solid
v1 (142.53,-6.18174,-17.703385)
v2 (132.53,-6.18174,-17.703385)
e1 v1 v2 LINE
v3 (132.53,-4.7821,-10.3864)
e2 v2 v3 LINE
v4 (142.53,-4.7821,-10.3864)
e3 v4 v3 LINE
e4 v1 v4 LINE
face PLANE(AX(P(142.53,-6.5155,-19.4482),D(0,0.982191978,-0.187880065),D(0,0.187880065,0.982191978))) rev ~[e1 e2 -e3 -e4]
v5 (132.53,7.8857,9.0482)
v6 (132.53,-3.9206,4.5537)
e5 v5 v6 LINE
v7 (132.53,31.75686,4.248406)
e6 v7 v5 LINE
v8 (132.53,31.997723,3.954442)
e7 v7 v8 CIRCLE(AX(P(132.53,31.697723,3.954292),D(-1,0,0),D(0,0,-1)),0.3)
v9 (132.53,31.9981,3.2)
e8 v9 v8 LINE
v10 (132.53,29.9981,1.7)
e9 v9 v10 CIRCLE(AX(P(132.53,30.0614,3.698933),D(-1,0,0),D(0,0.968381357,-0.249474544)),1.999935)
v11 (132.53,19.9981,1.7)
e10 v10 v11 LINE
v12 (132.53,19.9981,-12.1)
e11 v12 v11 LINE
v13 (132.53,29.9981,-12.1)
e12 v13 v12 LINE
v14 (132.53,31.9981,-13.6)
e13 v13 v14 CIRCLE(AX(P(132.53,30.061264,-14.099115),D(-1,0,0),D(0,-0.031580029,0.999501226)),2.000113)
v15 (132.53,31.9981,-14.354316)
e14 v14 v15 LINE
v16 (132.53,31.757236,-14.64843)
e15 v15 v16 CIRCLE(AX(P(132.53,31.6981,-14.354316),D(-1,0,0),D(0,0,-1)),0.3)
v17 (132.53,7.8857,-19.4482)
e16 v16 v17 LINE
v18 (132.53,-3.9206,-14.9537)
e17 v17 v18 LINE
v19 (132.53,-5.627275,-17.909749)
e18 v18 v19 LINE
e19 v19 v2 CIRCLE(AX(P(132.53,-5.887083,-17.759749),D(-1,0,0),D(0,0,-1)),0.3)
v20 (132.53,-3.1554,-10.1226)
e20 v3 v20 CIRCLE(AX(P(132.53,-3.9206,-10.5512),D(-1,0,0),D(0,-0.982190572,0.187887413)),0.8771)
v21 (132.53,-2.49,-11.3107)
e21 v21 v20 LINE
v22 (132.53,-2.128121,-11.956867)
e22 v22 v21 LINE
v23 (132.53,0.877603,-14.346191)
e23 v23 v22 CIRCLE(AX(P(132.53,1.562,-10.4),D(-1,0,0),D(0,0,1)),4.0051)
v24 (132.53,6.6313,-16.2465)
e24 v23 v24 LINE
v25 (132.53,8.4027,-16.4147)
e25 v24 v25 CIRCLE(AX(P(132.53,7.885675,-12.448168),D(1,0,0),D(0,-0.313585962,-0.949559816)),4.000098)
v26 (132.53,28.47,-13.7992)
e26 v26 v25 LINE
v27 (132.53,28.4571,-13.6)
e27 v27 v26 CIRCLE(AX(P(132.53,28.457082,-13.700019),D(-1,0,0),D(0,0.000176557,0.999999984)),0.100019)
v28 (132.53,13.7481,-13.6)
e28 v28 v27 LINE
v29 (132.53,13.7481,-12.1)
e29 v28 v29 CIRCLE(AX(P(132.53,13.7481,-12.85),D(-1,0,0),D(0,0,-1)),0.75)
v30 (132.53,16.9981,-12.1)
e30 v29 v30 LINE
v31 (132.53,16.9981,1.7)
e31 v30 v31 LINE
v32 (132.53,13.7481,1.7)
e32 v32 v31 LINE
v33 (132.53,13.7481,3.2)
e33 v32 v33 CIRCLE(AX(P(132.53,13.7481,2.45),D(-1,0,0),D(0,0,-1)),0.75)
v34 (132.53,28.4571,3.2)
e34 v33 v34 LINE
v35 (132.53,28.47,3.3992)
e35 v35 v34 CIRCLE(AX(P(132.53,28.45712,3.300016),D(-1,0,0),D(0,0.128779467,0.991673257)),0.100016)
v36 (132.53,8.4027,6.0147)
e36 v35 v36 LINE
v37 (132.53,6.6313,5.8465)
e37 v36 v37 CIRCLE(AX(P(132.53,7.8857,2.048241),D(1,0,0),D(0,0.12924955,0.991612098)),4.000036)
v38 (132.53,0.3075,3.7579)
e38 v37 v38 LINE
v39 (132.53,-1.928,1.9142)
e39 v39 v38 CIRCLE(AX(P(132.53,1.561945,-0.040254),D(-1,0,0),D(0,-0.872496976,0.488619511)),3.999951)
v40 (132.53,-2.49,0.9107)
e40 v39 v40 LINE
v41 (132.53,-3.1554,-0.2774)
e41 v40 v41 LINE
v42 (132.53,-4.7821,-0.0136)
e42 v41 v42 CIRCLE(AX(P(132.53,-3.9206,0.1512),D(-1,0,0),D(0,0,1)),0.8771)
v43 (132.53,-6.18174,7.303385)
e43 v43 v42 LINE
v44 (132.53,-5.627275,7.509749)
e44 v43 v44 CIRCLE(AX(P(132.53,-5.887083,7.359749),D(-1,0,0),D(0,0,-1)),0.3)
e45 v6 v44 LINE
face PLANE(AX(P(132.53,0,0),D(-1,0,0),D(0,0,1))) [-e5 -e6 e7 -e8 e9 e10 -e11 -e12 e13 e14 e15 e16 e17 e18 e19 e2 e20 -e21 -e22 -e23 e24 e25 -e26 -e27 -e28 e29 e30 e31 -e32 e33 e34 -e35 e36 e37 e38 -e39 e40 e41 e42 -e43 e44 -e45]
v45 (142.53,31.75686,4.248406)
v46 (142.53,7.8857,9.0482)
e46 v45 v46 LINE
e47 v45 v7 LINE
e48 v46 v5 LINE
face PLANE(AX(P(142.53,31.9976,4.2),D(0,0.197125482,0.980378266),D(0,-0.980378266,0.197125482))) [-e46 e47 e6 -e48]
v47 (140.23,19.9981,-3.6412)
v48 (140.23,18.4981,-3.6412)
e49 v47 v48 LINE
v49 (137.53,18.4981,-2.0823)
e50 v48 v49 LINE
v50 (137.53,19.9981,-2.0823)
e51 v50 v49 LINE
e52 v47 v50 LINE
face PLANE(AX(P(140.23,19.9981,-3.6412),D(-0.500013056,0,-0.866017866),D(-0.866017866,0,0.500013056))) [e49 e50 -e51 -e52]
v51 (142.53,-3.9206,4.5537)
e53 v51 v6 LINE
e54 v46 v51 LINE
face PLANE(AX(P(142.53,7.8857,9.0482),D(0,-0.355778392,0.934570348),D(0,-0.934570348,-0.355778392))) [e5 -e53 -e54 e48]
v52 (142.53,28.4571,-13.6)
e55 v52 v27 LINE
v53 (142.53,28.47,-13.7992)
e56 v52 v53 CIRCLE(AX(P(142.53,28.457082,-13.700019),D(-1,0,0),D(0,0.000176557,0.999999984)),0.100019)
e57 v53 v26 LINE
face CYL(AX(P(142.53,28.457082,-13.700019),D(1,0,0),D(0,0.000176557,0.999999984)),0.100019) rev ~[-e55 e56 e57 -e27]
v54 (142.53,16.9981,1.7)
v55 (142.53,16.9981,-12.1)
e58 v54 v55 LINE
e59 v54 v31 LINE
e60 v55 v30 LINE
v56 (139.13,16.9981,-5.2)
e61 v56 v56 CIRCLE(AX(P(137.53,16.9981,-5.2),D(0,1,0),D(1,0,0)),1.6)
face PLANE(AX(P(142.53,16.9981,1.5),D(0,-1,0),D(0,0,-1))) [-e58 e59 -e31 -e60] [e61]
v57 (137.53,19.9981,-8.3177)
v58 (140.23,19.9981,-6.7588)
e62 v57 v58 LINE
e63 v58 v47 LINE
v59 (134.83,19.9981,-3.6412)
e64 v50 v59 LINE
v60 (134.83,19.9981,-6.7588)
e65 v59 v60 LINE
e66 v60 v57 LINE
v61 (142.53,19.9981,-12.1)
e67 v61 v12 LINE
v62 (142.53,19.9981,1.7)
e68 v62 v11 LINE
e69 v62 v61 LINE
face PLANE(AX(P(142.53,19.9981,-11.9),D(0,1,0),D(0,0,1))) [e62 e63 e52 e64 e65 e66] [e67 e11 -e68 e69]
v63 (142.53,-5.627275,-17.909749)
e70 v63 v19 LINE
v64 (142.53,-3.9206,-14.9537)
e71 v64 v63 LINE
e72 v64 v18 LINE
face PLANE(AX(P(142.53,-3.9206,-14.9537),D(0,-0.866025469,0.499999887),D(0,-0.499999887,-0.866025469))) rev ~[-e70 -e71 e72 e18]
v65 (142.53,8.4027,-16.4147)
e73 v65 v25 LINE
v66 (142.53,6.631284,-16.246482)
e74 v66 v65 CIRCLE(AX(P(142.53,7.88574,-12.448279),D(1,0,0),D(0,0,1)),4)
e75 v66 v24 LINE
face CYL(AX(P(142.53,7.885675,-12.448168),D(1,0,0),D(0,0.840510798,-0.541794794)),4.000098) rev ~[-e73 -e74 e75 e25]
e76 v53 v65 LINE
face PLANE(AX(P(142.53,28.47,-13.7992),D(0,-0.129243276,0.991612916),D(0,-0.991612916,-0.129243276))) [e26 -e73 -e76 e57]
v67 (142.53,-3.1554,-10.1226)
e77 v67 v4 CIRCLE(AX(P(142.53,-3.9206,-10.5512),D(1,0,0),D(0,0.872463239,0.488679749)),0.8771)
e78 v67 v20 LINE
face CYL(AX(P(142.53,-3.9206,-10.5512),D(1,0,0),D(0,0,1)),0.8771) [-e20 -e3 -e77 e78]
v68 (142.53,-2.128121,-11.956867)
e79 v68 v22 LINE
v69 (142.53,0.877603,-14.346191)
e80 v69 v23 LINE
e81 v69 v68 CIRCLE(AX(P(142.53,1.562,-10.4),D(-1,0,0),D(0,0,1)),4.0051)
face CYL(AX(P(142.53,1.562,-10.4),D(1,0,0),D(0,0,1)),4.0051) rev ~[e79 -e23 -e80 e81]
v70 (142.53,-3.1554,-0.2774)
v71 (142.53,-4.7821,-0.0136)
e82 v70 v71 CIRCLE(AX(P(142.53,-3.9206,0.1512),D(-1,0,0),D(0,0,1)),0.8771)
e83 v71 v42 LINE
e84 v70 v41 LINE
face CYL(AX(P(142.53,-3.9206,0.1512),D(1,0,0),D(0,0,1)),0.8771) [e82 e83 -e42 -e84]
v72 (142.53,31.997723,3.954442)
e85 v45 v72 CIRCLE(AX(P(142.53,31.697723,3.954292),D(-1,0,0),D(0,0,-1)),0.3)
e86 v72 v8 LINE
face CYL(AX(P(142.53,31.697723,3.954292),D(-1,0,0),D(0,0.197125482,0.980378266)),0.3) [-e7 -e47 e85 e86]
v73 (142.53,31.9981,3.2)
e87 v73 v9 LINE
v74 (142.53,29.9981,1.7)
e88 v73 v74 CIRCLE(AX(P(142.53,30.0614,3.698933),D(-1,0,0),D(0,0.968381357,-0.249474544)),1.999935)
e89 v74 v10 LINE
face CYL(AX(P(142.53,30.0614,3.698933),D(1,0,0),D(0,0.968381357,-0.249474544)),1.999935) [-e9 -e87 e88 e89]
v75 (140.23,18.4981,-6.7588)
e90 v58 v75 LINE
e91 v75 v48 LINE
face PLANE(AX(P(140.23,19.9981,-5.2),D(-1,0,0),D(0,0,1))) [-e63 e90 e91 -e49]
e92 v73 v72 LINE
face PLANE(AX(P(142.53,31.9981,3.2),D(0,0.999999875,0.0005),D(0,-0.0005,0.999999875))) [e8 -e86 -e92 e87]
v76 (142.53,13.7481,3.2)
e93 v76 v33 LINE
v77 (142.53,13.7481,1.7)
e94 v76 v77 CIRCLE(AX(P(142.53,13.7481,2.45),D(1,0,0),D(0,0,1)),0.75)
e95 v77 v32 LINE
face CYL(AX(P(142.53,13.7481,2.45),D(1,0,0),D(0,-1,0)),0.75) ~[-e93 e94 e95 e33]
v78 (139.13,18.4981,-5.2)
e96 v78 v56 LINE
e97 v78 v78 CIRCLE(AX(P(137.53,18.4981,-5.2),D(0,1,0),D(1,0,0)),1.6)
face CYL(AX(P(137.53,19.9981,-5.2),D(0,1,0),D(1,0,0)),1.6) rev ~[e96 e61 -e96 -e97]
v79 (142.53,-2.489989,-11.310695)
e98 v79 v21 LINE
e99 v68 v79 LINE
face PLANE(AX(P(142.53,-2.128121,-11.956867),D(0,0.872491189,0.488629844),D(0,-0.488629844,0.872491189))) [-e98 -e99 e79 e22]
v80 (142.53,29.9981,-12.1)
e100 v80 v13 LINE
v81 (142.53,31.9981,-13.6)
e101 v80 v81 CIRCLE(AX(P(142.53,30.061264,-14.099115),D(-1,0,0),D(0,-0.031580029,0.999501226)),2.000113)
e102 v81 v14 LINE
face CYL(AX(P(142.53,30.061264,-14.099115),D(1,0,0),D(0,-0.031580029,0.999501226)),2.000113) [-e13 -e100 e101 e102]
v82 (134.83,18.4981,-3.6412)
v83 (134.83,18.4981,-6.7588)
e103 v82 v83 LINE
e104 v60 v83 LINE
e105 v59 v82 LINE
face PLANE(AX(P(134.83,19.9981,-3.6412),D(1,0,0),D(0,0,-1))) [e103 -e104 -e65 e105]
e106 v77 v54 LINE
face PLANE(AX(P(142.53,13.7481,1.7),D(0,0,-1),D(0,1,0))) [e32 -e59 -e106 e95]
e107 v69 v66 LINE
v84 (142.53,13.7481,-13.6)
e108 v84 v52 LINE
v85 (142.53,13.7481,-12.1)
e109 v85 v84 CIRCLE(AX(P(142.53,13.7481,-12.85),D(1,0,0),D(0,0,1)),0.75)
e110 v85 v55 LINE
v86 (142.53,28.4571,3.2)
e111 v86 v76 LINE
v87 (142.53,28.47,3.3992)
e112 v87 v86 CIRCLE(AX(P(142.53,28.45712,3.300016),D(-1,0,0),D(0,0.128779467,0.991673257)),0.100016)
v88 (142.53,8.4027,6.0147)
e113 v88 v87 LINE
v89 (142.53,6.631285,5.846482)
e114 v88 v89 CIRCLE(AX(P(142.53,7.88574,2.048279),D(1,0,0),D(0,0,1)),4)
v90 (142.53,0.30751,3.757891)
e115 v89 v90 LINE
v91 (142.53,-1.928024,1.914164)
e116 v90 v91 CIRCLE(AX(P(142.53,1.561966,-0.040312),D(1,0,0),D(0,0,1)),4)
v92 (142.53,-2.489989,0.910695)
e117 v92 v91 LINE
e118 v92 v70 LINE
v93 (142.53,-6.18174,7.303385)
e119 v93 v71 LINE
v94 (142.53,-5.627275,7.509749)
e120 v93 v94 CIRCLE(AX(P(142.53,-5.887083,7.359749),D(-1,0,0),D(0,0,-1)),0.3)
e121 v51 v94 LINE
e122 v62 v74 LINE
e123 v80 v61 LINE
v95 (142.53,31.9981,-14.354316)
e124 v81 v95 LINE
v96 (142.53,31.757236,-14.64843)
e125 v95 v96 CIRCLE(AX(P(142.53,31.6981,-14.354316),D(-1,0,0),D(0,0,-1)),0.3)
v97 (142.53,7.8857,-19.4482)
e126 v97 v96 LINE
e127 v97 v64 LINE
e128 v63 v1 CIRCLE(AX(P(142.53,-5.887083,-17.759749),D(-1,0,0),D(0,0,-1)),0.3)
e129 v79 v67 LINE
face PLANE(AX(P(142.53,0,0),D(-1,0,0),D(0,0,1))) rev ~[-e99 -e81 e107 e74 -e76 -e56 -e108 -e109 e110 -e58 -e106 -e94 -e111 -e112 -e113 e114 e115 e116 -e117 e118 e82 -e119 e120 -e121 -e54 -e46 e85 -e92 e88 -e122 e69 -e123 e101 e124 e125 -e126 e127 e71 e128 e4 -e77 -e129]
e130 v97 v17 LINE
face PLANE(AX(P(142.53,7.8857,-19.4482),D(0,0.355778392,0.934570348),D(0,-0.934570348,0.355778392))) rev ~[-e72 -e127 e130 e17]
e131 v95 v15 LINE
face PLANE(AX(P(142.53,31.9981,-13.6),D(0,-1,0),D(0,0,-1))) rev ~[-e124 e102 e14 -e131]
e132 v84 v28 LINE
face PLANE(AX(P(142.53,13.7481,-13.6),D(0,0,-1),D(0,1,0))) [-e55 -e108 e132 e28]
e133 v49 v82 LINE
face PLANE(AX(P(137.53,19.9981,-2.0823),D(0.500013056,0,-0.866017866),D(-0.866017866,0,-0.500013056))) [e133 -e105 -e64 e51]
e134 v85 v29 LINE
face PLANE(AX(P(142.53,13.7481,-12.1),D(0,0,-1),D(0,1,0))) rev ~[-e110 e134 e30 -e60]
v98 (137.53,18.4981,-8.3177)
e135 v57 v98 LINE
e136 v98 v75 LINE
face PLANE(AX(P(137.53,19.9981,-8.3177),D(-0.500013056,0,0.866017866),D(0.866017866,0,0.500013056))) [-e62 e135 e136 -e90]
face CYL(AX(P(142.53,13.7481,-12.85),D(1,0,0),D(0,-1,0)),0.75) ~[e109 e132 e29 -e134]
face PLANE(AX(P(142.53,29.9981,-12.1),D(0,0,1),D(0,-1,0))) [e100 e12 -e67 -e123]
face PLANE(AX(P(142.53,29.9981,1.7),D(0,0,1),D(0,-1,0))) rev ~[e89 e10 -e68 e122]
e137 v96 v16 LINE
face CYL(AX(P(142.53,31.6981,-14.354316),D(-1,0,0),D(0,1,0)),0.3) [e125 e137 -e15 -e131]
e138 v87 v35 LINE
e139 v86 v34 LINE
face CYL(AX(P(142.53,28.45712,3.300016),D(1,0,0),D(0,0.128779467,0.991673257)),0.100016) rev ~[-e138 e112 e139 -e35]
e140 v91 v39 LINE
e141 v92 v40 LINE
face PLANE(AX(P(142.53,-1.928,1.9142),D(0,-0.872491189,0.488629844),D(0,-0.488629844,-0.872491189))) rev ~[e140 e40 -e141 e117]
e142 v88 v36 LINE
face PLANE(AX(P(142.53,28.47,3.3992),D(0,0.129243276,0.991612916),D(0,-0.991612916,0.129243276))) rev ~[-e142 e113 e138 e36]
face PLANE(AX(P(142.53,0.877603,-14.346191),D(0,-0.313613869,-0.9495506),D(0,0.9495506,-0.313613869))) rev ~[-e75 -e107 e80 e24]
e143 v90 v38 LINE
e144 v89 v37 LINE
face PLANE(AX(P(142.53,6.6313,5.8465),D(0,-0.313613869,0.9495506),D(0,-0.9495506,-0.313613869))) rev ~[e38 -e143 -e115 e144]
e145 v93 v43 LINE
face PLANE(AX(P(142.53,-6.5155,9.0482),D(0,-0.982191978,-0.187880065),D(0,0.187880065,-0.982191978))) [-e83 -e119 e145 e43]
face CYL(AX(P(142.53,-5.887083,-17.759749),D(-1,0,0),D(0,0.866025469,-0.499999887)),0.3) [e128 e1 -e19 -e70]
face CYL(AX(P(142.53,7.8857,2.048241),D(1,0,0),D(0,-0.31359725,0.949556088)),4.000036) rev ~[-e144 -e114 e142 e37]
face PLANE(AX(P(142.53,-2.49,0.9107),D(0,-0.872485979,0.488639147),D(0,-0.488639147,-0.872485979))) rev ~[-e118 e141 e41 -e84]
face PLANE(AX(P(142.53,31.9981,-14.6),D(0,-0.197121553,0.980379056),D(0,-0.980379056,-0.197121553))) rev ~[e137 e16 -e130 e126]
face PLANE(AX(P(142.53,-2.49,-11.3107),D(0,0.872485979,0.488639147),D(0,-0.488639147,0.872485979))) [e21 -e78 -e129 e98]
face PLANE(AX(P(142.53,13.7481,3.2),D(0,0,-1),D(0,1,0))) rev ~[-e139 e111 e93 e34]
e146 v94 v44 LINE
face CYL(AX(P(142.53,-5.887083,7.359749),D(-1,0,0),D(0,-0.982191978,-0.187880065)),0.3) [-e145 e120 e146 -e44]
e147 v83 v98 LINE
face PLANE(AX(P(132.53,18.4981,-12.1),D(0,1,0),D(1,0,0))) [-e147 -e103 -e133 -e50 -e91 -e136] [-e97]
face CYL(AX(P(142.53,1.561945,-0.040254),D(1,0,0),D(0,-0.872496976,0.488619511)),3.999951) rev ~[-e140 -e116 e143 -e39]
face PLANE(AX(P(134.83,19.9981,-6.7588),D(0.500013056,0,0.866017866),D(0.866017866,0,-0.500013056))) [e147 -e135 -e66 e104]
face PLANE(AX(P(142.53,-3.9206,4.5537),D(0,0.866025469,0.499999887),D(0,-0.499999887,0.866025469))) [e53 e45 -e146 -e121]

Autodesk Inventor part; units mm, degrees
ref_plane "YZ Plane" through (0, 0, 0) normal (1, 0, 0) x (0, 1, 0)
ref_plane "XZ Plane" through (0, 0, 0) normal (0, 1, 0) x (-1, 0, 0)
ref_plane "XY Plane" through (0, 0, 0) normal (0, 0, 1) x (1, 0, 0)
sketch "Эскиз8" plane through (0, 0, 0) normal (1, 0, 0) x (0, 1, 0)
  line L0 (0, 0) -> (10.4, 0)
  line L1 (10.4, 0) -> (10.4, -10.4)
  line L2 (10.4, -10.4) -> (0, -10.4)
  line L3 (0, -10.4) -> (0, 0)
  line L4 (5.2, 0) -> (5.2, 4)
  line L5 (5.2, -10.4) -> (5.2, -14.4)
  circle A0 centre (5.2, 4) radius 1.6
  circle A1 centre (5.2, -14.4) radius 1.6
  line L6 (5.2, 4) -> (7.9, 4)
  line L7 (7.9, 2.4412) -> (5.2, 0.8823)
  line L8 (5.2, 0.8823) -> (2.5, 2.4412)
  line L9 (2.5, 2.4412) -> (2.5, 5.5588)
  line L10 (2.5, 5.5588) -> (5.2, 7.1177)
  line L11 (5.2, 7.1177) -> (7.9, 5.5588)
  line L12 (7.9, 5.5588) -> (7.9, 2.4412)
  line L13 (7.9, -15.9588) -> (5.2, -17.5177)
  line L14 (5.2, -17.5177) -> (2.5, -15.9588)
  line L15 (2.5, -15.9588) -> (2.5, -12.8412)
  line L16 (2.5, -12.8412) -> (5.2, -11.2823)
  line L17 (5.2, -11.2823) -> (7.9, -12.8412)
  line L18 (7.9, -12.8412) -> (7.9, -15.9588)
  circle A2 centre (5.2, 4) radius 5.2
  circle A3 centre (5.2, -14.4) radius 5.2
  line L19 (10.4, 4) -> (10.4, 0)
  line L20 (10.4, -10.4) -> (10.4, -14.4)
  line L21 (0, -14.4) -> (0, -10.4)
  line L22 (0, 4) -> (0, 0)
  line L23 (7.9, 5.5588) -> (7.9, 8.4441)
  line L24 (2.5, 5.5588) -> (2.5, 8.4441)
  line L25 (2.5, -15.9588) -> (2.5, -18.8441)
  line L26 (7.9, -15.9588) -> (7.9, -18.8441)
  line L27 (0, 0) -> (-3, 0)
  line L28 (-3, 0) -> (-3, -10.4)
  line L29 (-3, -10.4) -> (0, -10.4)
  line L30 (0, -10.4) -> (0, 0)
  line L31 (10.4, 0) -> (8.9, 2.5981)
  line L32 (10.4, -10.4) -> (8.9, -12.9981)
  line L33 (10.4, -10.4) -> (13.4, -10.4) construction
  line L34 (8.9, -12.9981) -> (4.4, -10.4)
  line L35 (8.9, 2.5981) -> (4.4, 0)
  line L36 (-3, 0) -> (0.663, 6.5408)
  line L37 (-3, -10.4) -> (0.663, -16.9408)
  line L38 (10.4, 0) -> (12.9981, 1.5)
  line L39 (12.9981, 1.5) -> (9.5707, 6.8173)
  line L40 (10.4, -10.4) -> (12.9981, -11.9)
  line L41 (12.9981, -11.9) -> (9.5707, -17.2173)
  point P0 (7.9, -14.4)
  dimension "d51" = 10.4
  dimension "d52" = 10.4
  dimension "d53" = 4
  dimension "d54" = 4
  dimension "d55" = 3.2
  dimension "d56" = 3.2
  dimension "d57" = 2.7
  dimension "d58" = 3
  dimension "d59" = 3
  dimension "d60" = 3
  dimension "d61" = 120
  dimension "d62" = 3
  dimension "d63" = 3
extrude "Выдавливание6" add sketch "Эскиз8" along normal blind 5 contours L0 A2 L24 L9 L8 L4 L35 | L0 L22 A2 | L4 L7 L12 L23 A2 L31 L35 | L27 L36 A2 L22 | L3 L29 L28 L27 | L31 A2 L19 | L19 A2 L39 L38 | L2 A3 L21 | L21 A3 L37 L29 | L40 L41 A3 L20 | L20 A3 L32 | L2 L34 L5 L16 L15 L25 A3 | A3 L26 L18 L17 L5 L34 L32
sketch "Эскиз9" plane through (0, 0, 0) normal (-1, 0, 0) x (0, 0, 1)
  arc A0 (-18.8441, 2.5) -> (-16.9408, 0.663) centre (-14.4, 5.2) ccw projected
  circle A1 centre (-14.4, 5.2) radius 5.2
  circle A2 centre (-14.4, 5.2) radius 1.6
  arc A3 (6.5408, 0.663) -> (8.4441, 2.5) centre (4, 5.2) ccw projected
  circle A4 centre (4, 5.2) radius 5.2
  circle A5 centre (4, 5.2) radius 1.6
  line L0 (2.5981, 8.9) -> (0, 10.4) projected
  line L1 (0, 10.4) -> (2.5981, 8.9)
  line L2 (0, 4.4) -> (2.5981, 8.9) projected
  line L3 (2.5981, 8.9) -> (0, 4.4)
  line L4 (0, 0) -> (0, 4.4) projected
  line L5 (0, 4.4) -> (0, 0)
  line L6 (-10.4, 4.4) -> (-10.4, 0) projected
  line L7 (0, 0) -> (-10.4, 0)
  line L8 (-10.4, 0) -> (-10.4, 1.8774)
  line L9 (-10.4, 10.4) -> (-12.9981, 8.9) projected
  line L10 (-11.699, 9.65) -> (-10.4, 10.4)
  line L11 (-11.9, 12.9981) -> (-10.4, 10.4) projected
  line L12 (-10.4, 10.4) -> (-11.9, 12.9981)
  line L13 (-17.2173, 9.5707) -> (-11.9, 12.9981) projected
  line L14 (-11.9, 12.9981) -> (-17.2173, 9.5707)
  line L15 (0, 10.4) -> (1.5, 12.9981) projected
  line L16 (0, 10.4) -> (1.5, 12.9981)
  line L17 (1.5, 12.9981) -> (6.8173, 9.5707) projected
  line L18 (1.5, 12.9981) -> (6.8173, 9.5707)
  line L19 (0, -3) -> (-10.4, -3) projected
  line L20 (0, -3) -> (6.5408, 0.663)
  line L21 (6.5408, 0.663) -> (0, -3) projected
  line L22 (-10.4, -3) -> (-16.9408, 0.663)
  line L23 (-10.4, -3) -> (-16.9408, 0.663) projected
  line L24 (-10.4, -3) -> (0, -3)
  line L25 (-10.4, 0) -> (0, 0) projected
  line L26 (0, 0) -> (-10.4, 0)
  line L27 (-10.4, 0) -> (-10.4, 1.8774)
  line L28 (0, 1.8774) -> (0, 0)
  line L29 (-11.699, 9.65) -> (-12.9981, 8.9)
  line L30 (-12.9981, 8.9) -> (-10.4, 4.4) projected
  line L31 (-10.4, 4.4) -> (-12.9981, 8.9)
  line L32 (-12.9981, 8.9) -> (-10.4, 4.4)
  line L33 (-10.4, 4.4) -> (-10.4, 1.8774)
  line L34 (0, 1.8774) -> (0, 4.4)
  line L35 (2.5981, 8.9) -> (0, 4.4)
  line L36 (1.299, 9.65) -> (2.5981, 8.9)
  point P0 (-18.8441, 2.5)
  point P1 (-16.9408, 0.663)
  point P2 (6.5408, 0.663)
  point P3 (8.4441, 2.5)
  dimension "d66" = 3.2
  dimension "d67" = 3.2
extrude "Выдавливание7" add sketch "Эскиз9" along normal blind 5 contours A1 L9 L30 L6 A0 | A1 L6 L7 L4 A4 L20 L19 L22 | L13 L11 L9 A1 | A4 L4 L2 L0 A3 | L0 L15 L17 A4
sketch "Эскиз10" plane through (5, 0, 0) normal (1, 0, 0) x (0, 0, -1)
  line L0 (-1.5, 12.9981) -> (-6.8173, 9.5707) projected
  line L1 (0, 10.4) -> (-1.5, 12.9981) projected
  line L2 (-1.5, 12.9981) -> (0, 10.4)
  line L3 (-2.5981, 8.9) -> (0, 10.4) projected
  line L4 (0, 10.4) -> (-2.5981, 8.9)
  line L5 (0, 4.4) -> (-2.5981, 8.9) projected
  line L6 (-2.5981, 8.9) -> (0, 4.4)
  line L7 (0, 0) -> (0, 4.4) projected
  line L8 (0, 4.4) -> (0, 0)
  line L9 (10.4, 0) -> (0, 0) projected
  line L10 (0, 0) -> (10.4, 0)
  line L11 (10.4, 4.4) -> (10.4, 0) projected
  line L12 (10.4, 0) -> (10.4, 4.4)
  line L13 (10.4, 10.4) -> (12.9981, 8.9) projected
  line L14 (10.4, 4.4) -> (12.9981, 8.9)
  line L15 (12.9981, 8.9) -> (10.4, 10.4)
  line L16 (11.9, 12.9981) -> (10.4, 10.4) projected
  line L17 (10.4, 10.4) -> (11.9, 12.9981)
  line L18 (17.2173, 9.5707) -> (11.9, 12.9981) projected
  line L19 (11.9, 12.9981) -> (17.2173, 9.5707)
  line L20 (17.2173, 9.5707) -> (13.6704, -1.1685)
  line L21 (10.4, -3) -> (16.9408, 0.663) projected
  line L22 (10.4, -3) -> (13.6704, -1.1685)
  line L23 (0, -3) -> (10.4, -3) projected
  line L24 (-6.5408, 0.663) -> (0, -3) projected
  line L25 (10.4, -3) -> (0, -3)
  arc A0 (-8.4441, 2.5) -> (-6.5408, 0.663) centre (-4, 5.2) ccw projected
  line L26 (0, -3) -> (-6.5408, 0.663)
  line L27 (-3.2704, -1.1685) -> (-6.8173, 9.5707)
  line L28 (-6.8173, 9.5707) -> (-1.5, 12.9981)
extrude "Выдавливание8" add sketch "Эскиз10" along normal blind 157.53
sketch "Эскиз17" plane through (-5, 0, 0) normal (-1, 0, 0) x (0, 0, 1)
  line L0 (-37.7292, 41.1824) -> (41.3103, 41.1824)
  line L1 (41.3103, 41.1824) -> (41.3103, -34.7876)
  line L2 (41.3103, -34.7876) -> (-37.7292, -34.7876)
  line L3 (-37.7292, -34.7876) -> (-37.7292, 41.1824)
  point P0 (0, 0)
extrude "Выдавливание13" cut sketch "Эскиз17" against normal blind 147.53
sketch "Эскиз23" plane through (162.53, 0, 0) normal (1, 0, 0) x (0, 0, -1)
  point P0 (0, 0)
fillet "Сопряжение12" radius 4 6 edges at (152.53, -3, -10.4) (152.53, -1.1685, -13.6704) (152.53, -3, 0) (152.53, -1.1685, 3.2704) (152.53, 9.5707, -17.2173) (152.53, 9.5707, 6.8173)
sketch "Эскиз24" plane through (142.53, 0, 0) normal (-1, 0, 0) x (0, 0, 1)
  line L0 (-11.9, 12.9981) -> (-10.4, 10.4) projected
  line L1 (-11.9, 12.9981) -> (1.5, 12.9981)
  line L2 (1.5, 12.9981) -> (1.5, 16.9981)
  line L3 (1.5, 16.9981) -> (-11.9, 16.9981)
  line L4 (-11.9, 16.9981) -> (-11.9, 12.9981)
  line L5 (1.5, 16.9981) -> (-11.9, 16.9981)
  line L6 (-11.9, 16.9981) -> (-11.9, 19.9981)
  line L7 (-11.9, 19.9981) -> (1.5, 19.9981)
  line L8 (1.5, 19.9981) -> (1.5, 16.9981)
  line L9 (-11.9, 16.9981) -> (-11.7, 16.9981) construction
  line L10 (-14.6154, 11.2478) -> (-11.9, 12.9981) projected
  line L11 (-12.1, 12.9981) -> (-11.9, 12.9981)
  line L12 (1.5, 12.9981) -> (1.7, 12.9981)
  line L13 (1.7, 13.7481) -> (1.7, 19.9981)
  line L14 (1.7, 19.9981) -> (1.5, 19.9981)
  line L15 (-12.1, 13.7481) -> (-12.1, 19.9981)
  line L16 (-12.1, 19.9981) -> (-11.9, 19.9981)
  line L17 (-12.1, 16.9981) -> (-11.9, 16.9981)
  line L18 (1.5, 16.9981) -> (1.7, 16.9981)
  line L19 (-12.85, 12.9981) -> (-12.85, 12.9981)
  line L20 (-13.6, 13.7481) -> (-13.6, 28.4571)
  line L21 (-13.6, 29.9981) -> (-12.1, 29.9981)
  line L22 (-12.1, 29.9981) -> (-12.1, 12.9981)
  line L23 (2.45, 12.9981) -> (2.45, 12.9981)
  line L24 (3.2, 13.7481) -> (3.2, 28.4571)
  line L25 (3.2, 29.9981) -> (1.7, 29.9981)
  line L26 (1.7, 29.9981) -> (1.7, 12.9981)
  line L27 (-13.7992, 28.47) -> (-16.4147, 8.4027)
  arc A0 (-14.6154, 11.2478) -> (-16.2465, 6.6313) centre (-12.4482, 7.8857) ccw projected
  line L28 (3.3992, 28.47) -> (6.0147, 8.4027)
  arc A1 (5.8465, 6.6313) -> (4.2154, 11.2478) centre (2.0482, 7.8857) ccw projected
  arc A2 (-12.85, 12.9981) -> (-12.1, 13.7481) centre (-12.85, 13.7481) ccw
  arc A3 (-13.6, 13.7481) -> (-12.85, 12.9981) centre (-12.85, 13.7481) ccw
  arc A4 (1.7, 13.7481) -> (2.45, 12.9981) centre (2.45, 13.7481) ccw
  arc A5 (2.45, 12.9981) -> (3.2, 13.7481) centre (2.45, 13.7481) ccw
  line L29 (-14.1579, 0.3075) -> (-16.2465, 6.6313) projected
  line L30 (-16.2465, 6.6313) -> (-14.1579, 0.3075)
  circle A6 centre (-12.4482, 7.8857) radius 4
  line L31 (5.8465, 6.6313) -> (3.7579, 0.3075) projected
  circle A7 centre (2.0482, 7.8857) radius 4
  arc A8 (1.9142, -1.928) -> (3.7579, 0.3075) centre (-0.0403, 1.562) ccw projected
  circle A9 centre (-0.0403, 1.562) radius 4
  arc A10 (-1.0438, -3) -> (0.9107, -2.49) centre (-1.0438, 1) ccw projected
  circle A11 centre (-1.0438, 1) radius 4
  line L32 (-10.4, 4.4) -> (-10.4, 0) projected
  circle A12 centre (-10.4, 1.562) radius 4.0051
  arc A13 (-11.3107, -2.49) -> (-9.3562, -3) centre (-9.3562, 1) ccw projected
  circle A14 centre (-9.3562, 1) radius 4
  arc A15 (-14.1579, 0.3075) -> (-12.3142, -1.928) centre (-10.3597, 1.562) ccw projected
  line L33 (-12.3142, -1.928) -> (-11.3107, -2.49)
  line L34 (1.9142, -1.928) -> (0.9107, -2.49) projected
  line L35 (1.9142, -1.928) -> (0.9107, -2.49)
  line L36 (-1.0438, -3) -> (-9.3562, -3) projected
  line L37 (-9.3562, -3) -> (-1.0438, -3)
  line L38 (0.9107, -2.49) -> (-0.2774, -3.1554)
  line L39 (-11.3107, -2.49) -> (-10.1226, -3.1554)
  line L40 (2.0482, 7.8857) -> (6.0482, 7.8857)
  line L41 (6.0482, 7.8857) -> (9.0482, 7.8857)
  line L42 (-16.4482, 7.8857) -> (-19.4482, 7.8857)
  line L43 (-19.4482, 7.8857) -> (-14.9537, -3.9206)
  line L44 (-13.6, 29.9981) -> (-13.6, 31.9981)
  line L45 (3.2, 29.9981) -> (3.2, 31.9981)
  arc A16 (3.2, 31.9981) -> (1.7, 29.9981) centre (3.699, 30.0613) ccw
  arc A17 (-12.1, 29.9981) -> (-13.6, 31.9981) centre (-14.099, 30.0613) ccw
  arc A18 (3.3992, 28.47) -> (3.2, 28.4571) centre (3.3, 28.4571) ccw
  arc A19 (-13.6, 28.4571) -> (-13.7992, 28.47) centre (-13.7, 28.4571) ccw
  line L46 (3.2, 31.9981) -> (4.2, 31.9976)
  line L47 (4.2, 31.9976) -> (9.0482, 7.8857)
  line L48 (-13.6, 31.9981) -> (-14.6, 31.9981)
  line L49 (-14.6, 31.9981) -> (-19.4482, 7.8857)
  line L50 (9.0482, 7.8857) -> (4.5537, -3.9206)
  circle A20 centre (0.1512, -3.9206) radius 0.8771
  circle A21 centre (-10.5512, -3.9206) radius 0.8771
  line L51 (4.5537, -3.9206) -> (9.0482, -6.5155)
  line L52 (4.5537, -3.9206) -> (9.7436, -3.9206) construction
  line L53 (9.0482, -6.5155) -> (-0.0136, -4.7821)
  line L54 (-14.9537, -3.9206) -> (-19.4482, -6.5155)
  line L55 (-14.9537, -3.9206) -> (-9.7638, -3.9206) construction
  line L56 (-19.4482, -6.5155) -> (-10.3864, -4.7821)
  point P0 (0, 0)
  point P1 (-13.6, 12.9981)
  point P2 (3.2, 12.9981)
  point P3 (-15.1183, -5.3024)
  point P4 (-11.3107, -2.49)
  point P5 (-11.9564, -2.1284)
  point P6 (-14.3463, 0.8779)
  dimension "d145" = 4
  dimension "d149" = 0.2
  dimension "d150" = 1.5
  dimension "d151" = 17
  dimension "d152" = 1.5
  dimension "d153" = 17
  dimension "d154" = 0.75
  dimension "d161" = 3
  dimension "d162" = 3
  dimension "d163" = 2
  dimension "d164" = 2
  dimension "d165" = 2
  dimension "d166" = 0.1
  dimension "d167" = 1
  dimension "d168" = 1
  dimension "d187" = 30
  dimension "d188" = 150
extrude "Выдавливание17" add sketch "Эскиз24" along normal blind 10 contours L6 L7 L8 L3 | L17 L15 L16 L6 | L8 L14 L13 L18 | L15 A2 A3 L20 A19 L27 A0 L42 L49 L48 L44 L21 L22 | L13 L26 L25 L45 L46 L47 L41 A1 L28 A18 L24 A5 A4 | A0 L29 A12 L33 L39 A21 L56 L54 L43 L42 | L21 L44 A17 | A16 L45 L25 | A21 | L34 A8 L31 A1 L41 L50 L51 L53 A20 L38 | A20
fillet "Сопряжение13" radius 0.3 4 edges at (137.53, 31.9976, 4.2) (137.53, 31.9981, -14.6) (137.53, -6.5155, 9.0482) (137.53, -6.5155, -19.4482)
sketch "Эскиз25" plane through (162.53, 0, 0) normal (1, 0, 0) x (0, 0, -1)
  line L0 (-19.4307, 22.3831) -> (30.691, 22.3831)
  line L1 (30.691, 22.3831) -> (30.691, -15.6545)
  line L2 (30.691, -15.6545) -> (-19.4307, -15.6545)
  line L3 (-19.4307, -15.6545) -> (-19.4307, 22.3831)
  point P0 (0, 0)
extrude "Выдавливание18" cut sketch "Эскиз25" against normal blind 20
sketch "Эскиз28" plane through (132.53, 19.9981, -12.1) normal (0, 1, 0) x (1, 0, 0)
  line L0 (0, -13.8) -> (0, 0) projected
  line L1 (0, -6.9) -> (10, -6.9)
  line L2 (10, -13.8) -> (10, 0) projected
  circle A0 centre (5, -6.9) radius 1.6
  point P0 (-132.53, -12.1)
  dimension "d189" = 3.2
extrude "Выдавливание21" cut sketch "Эскиз28" against normal blind 10
sketch "Эскиз29" plane through (132.53, 19.9981, -12.1) normal (0, 1, 0) x (1, 0, 0)
  circle A0 centre (5, -6.9) radius 1.6 projected
  line L0 (5, -6.9) -> (7.7, -6.9)
  line L1 (7.7, -8.4588) -> (5, -10.0177)
  line L2 (5, -10.0177) -> (2.3, -8.4588)
  line L3 (2.3, -8.4588) -> (2.3, -5.3412)
  line L4 (2.3, -5.3412) -> (5, -3.7823)
  line L5 (5, -3.7823) -> (7.7, -5.3412)
  line L6 (7.7, -5.3412) -> (7.7, -8.4588)
  point P0 (-132.53, -12.1)
  dimension "d192" = 2.7
extrude "Выдавливание22" cut sketch "Эскиз29" against normal blind 1.5
properties part number "защёлка_выдача2"
